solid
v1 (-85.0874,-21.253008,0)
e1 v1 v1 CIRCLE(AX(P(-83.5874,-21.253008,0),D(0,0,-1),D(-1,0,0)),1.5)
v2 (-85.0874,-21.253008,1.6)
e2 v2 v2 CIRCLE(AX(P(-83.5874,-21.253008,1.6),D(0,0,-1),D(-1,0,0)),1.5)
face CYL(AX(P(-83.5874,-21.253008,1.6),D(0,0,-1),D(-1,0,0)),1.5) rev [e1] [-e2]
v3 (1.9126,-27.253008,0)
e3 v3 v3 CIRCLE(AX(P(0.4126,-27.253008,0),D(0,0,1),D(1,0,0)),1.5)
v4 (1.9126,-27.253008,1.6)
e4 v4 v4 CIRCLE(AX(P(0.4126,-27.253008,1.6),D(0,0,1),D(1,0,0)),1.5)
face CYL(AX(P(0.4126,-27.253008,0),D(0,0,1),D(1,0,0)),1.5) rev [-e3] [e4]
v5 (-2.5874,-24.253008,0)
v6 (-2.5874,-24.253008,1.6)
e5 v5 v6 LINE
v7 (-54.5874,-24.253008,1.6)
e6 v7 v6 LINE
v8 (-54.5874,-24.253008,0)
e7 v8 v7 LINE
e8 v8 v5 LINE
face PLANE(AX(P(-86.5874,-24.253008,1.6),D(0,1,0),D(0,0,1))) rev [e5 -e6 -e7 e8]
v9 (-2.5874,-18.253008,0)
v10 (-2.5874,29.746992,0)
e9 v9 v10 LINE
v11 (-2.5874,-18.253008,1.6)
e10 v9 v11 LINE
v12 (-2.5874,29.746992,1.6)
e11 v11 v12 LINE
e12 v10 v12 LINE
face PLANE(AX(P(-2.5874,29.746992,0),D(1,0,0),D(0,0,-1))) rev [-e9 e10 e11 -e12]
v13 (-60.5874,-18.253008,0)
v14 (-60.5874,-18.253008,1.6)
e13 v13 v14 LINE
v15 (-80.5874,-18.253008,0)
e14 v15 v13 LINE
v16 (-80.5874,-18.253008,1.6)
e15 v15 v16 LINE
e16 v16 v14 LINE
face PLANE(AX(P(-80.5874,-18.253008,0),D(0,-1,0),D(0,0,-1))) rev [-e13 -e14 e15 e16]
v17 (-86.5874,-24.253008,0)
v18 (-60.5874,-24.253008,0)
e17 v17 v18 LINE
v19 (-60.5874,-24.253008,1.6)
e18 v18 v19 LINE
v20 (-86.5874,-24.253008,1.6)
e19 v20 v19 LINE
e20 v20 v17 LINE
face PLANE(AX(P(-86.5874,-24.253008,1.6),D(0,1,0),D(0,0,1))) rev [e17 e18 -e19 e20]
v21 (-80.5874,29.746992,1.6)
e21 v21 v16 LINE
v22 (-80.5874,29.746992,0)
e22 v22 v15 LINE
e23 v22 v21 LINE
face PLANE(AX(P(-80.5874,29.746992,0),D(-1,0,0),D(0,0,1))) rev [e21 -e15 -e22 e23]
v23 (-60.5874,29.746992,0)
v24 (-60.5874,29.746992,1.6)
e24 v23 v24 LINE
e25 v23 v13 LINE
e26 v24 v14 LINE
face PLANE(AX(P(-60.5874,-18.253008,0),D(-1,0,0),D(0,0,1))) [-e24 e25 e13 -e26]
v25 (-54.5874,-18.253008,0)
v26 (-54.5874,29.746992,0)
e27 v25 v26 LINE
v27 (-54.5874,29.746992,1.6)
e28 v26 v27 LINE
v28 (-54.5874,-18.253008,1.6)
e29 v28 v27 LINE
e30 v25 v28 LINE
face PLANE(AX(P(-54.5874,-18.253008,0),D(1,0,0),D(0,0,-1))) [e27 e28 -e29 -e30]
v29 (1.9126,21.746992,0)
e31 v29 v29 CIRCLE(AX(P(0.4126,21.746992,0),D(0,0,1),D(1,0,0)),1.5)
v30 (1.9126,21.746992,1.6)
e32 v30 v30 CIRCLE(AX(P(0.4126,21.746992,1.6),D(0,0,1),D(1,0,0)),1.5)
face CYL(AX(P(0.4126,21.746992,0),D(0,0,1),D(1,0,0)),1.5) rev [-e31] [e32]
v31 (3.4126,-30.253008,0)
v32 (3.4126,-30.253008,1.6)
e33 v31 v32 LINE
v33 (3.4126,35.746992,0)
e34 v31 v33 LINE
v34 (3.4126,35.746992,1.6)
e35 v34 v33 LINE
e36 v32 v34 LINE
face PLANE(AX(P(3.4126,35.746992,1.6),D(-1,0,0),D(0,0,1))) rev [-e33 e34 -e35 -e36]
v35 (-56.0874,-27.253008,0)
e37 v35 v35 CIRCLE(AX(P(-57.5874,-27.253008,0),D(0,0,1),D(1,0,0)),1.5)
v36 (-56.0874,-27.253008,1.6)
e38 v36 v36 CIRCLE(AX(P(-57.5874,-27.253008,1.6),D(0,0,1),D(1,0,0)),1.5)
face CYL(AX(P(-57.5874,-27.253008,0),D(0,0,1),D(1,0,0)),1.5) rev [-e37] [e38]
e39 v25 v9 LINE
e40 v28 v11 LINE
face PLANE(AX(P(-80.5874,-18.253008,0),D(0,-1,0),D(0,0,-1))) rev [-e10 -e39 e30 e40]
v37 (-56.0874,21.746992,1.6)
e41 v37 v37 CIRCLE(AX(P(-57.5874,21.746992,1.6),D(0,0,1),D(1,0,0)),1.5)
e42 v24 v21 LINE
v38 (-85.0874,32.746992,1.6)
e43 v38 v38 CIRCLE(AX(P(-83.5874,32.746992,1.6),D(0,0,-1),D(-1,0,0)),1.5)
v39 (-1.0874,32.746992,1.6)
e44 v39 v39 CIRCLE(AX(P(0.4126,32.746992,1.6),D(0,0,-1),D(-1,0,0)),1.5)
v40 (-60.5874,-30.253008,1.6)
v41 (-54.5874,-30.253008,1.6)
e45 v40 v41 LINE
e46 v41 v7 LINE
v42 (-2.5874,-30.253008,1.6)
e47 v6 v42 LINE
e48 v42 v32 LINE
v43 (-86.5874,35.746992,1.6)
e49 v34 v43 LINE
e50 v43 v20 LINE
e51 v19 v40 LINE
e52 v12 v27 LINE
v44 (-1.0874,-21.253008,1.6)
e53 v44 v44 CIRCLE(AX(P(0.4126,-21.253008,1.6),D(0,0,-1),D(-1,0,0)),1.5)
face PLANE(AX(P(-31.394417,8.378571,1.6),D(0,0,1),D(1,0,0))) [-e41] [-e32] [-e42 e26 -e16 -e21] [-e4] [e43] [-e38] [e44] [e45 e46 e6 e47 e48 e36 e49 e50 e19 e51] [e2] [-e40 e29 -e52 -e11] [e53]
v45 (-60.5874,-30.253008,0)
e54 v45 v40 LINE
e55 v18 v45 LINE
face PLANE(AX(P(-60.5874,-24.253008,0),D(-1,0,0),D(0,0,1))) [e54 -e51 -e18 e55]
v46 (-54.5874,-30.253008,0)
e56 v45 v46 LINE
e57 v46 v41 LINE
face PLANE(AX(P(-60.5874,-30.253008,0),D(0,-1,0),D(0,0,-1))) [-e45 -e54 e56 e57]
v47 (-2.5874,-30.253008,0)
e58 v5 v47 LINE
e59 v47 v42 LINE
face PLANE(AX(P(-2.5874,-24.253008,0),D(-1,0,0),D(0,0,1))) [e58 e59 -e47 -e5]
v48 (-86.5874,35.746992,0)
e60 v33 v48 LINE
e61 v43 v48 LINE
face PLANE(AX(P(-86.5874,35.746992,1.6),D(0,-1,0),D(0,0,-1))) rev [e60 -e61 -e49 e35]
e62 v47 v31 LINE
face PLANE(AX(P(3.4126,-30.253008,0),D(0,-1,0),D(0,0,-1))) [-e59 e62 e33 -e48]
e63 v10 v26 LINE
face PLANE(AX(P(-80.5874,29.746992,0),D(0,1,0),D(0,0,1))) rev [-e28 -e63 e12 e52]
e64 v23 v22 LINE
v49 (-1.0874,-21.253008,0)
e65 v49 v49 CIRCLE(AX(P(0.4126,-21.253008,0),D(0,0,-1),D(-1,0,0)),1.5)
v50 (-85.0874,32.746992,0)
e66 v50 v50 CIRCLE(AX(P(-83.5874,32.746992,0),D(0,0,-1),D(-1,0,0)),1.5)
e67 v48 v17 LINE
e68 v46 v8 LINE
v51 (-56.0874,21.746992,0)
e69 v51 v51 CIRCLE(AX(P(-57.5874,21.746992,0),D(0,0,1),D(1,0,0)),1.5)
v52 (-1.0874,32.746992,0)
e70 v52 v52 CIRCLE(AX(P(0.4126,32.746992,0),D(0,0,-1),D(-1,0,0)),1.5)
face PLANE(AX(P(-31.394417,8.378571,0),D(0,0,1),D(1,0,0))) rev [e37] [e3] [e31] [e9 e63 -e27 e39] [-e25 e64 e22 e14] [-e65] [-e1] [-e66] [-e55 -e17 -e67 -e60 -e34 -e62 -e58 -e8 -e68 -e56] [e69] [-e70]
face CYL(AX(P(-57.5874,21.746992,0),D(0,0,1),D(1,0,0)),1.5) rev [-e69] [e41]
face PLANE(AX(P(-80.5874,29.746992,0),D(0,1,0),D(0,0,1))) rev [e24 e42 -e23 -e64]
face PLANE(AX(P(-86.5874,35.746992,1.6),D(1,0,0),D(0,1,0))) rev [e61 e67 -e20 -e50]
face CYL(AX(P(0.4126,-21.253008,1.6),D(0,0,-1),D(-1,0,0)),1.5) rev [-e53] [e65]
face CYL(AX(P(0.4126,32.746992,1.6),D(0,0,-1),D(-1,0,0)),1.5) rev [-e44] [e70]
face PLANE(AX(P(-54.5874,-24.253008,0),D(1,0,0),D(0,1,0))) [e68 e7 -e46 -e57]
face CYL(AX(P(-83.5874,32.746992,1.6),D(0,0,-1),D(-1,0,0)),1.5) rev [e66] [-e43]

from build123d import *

# Parameters (mm, degrees)
PLATES_BASE_OUTLINE_W   = 90
PLATES_BASE_OUTLINE_H   = 60
PLATES_BASE_OUTLINE_R   = 1.5
PLATES_BASE_OUTLINE_W_2 = 76
PLATES_BASE_OUTLINE_H_2 = 20
PLATES_BASE_DEPTH       = 1.6
SKETCH_4_W              = 78
SKETCH_4_H              = 48
CUT_EXTRUDE_1_DEPTH     = 94.689835584
SKETCH_7_W              = 6
SKETCH_7_H              = 6
EXTRUDE_4_DEPTH         = 1.6
SKETCH_8_W              = 6
SKETCH_8_H              = 48
EXTRUDE_5_DEPTH         = 1.6
SKETCH_10_R             = 1.5
CUT_EXTRUDE_4_DEPTH     = 1.6


# Read off the part's stored shape, not the designer's step: plates=base
with BuildPart() as part:
    # plates=base outline → plates=base (new body)
    with BuildSketch(Plane.XY):
        with Locations((-41.587399894, 5.746992481)):
            Rectangle(PLATES_BASE_OUTLINE_W, PLATES_BASE_OUTLINE_H)
        with Locations((-83.587399894, -21.253007519)):
            Circle(PLATES_BASE_OUTLINE_R, mode=Mode.SUBTRACT)
        with Locations((0.412600106, -21.253007519)):
            Circle(PLATES_BASE_OUTLINE_R, mode=Mode.SUBTRACT)
        with Locations((-41.587399894, -7.253007519)):
            Rectangle(PLATES_BASE_OUTLINE_W_2, PLATES_BASE_OUTLINE_H_2, mode=Mode.SUBTRACT)
        with Locations((-78.587399894, 5.746992481)):
            Circle(PLATES_BASE_OUTLINE_R, mode=Mode.SUBTRACT)
        with Locations((-83.587399894, 32.746992481)):
            Circle(PLATES_BASE_OUTLINE_R, mode=Mode.SUBTRACT)
        with Locations((-41.587399894, 18.746992481)):
            Rectangle(PLATES_BASE_OUTLINE_W_2, PLATES_BASE_OUTLINE_H_2, mode=Mode.SUBTRACT)
        with Locations((-4.587399894, 5.746992481)):
            Circle(PLATES_BASE_OUTLINE_R, mode=Mode.SUBTRACT)
        with Locations((0.412600106, 32.746992481)):
            Circle(PLATES_BASE_OUTLINE_R, mode=Mode.SUBTRACT)
    extrude(amount=PLATES_BASE_DEPTH)

    # ｽｹｯﾁ4 → ｶｯﾄ - 押し出し1 (cut, through all)
    with BuildSketch(Plane.XY.offset(1.6)):
        with Locations((-41.587399894, 5.746992481)):
            Rectangle(SKETCH_4_W, SKETCH_4_H)
    extrude(amount=-CUT_EXTRUDE_1_DEPTH, mode=Mode.SUBTRACT)

    # ｽｹｯﾁ7 → ﾎﾞｽ - 押し出し4 (add)
    with BuildSketch(Plane.XY.offset(1.6)):
        with Locations((0.412600106, -27.253007519)):
            Rectangle(SKETCH_7_W, SKETCH_7_H)
        with Locations((-57.587399894, -27.253007519)):
            Rectangle(SKETCH_7_W, SKETCH_7_H)
    extrude(amount=-EXTRUDE_4_DEPTH)

    # ｽｹｯﾁ8 → ﾎﾞｽ - 押し出し5 (add)
    with BuildSketch(Plane.XY.offset(1.6)):
        with Locations((-57.587399894, 5.746992481)):
            Rectangle(SKETCH_8_W, SKETCH_8_H)
    extrude(amount=-EXTRUDE_5_DEPTH)

    # ｽｹｯﾁ10 → ｶｯﾄ - 押し出し4 (cut)
    with BuildSketch(Plane.XY.offset(1.6)):
        with Locations((0.412600106, -27.253007519)):
            Circle(SKETCH_10_R)
        with Locations((-57.587399894, -27.253007519)):
            Circle(SKETCH_10_R)
        with Locations((-57.587399894, 21.746992481)):
            Circle(SKETCH_10_R)
        with Locations((0.412600106, 21.746992481)):
            Circle(SKETCH_10_R)
    extrude(amount=-CUT_EXTRUDE_4_DEPTH, mode=Mode.SUBTRACT)


solid = part.part
